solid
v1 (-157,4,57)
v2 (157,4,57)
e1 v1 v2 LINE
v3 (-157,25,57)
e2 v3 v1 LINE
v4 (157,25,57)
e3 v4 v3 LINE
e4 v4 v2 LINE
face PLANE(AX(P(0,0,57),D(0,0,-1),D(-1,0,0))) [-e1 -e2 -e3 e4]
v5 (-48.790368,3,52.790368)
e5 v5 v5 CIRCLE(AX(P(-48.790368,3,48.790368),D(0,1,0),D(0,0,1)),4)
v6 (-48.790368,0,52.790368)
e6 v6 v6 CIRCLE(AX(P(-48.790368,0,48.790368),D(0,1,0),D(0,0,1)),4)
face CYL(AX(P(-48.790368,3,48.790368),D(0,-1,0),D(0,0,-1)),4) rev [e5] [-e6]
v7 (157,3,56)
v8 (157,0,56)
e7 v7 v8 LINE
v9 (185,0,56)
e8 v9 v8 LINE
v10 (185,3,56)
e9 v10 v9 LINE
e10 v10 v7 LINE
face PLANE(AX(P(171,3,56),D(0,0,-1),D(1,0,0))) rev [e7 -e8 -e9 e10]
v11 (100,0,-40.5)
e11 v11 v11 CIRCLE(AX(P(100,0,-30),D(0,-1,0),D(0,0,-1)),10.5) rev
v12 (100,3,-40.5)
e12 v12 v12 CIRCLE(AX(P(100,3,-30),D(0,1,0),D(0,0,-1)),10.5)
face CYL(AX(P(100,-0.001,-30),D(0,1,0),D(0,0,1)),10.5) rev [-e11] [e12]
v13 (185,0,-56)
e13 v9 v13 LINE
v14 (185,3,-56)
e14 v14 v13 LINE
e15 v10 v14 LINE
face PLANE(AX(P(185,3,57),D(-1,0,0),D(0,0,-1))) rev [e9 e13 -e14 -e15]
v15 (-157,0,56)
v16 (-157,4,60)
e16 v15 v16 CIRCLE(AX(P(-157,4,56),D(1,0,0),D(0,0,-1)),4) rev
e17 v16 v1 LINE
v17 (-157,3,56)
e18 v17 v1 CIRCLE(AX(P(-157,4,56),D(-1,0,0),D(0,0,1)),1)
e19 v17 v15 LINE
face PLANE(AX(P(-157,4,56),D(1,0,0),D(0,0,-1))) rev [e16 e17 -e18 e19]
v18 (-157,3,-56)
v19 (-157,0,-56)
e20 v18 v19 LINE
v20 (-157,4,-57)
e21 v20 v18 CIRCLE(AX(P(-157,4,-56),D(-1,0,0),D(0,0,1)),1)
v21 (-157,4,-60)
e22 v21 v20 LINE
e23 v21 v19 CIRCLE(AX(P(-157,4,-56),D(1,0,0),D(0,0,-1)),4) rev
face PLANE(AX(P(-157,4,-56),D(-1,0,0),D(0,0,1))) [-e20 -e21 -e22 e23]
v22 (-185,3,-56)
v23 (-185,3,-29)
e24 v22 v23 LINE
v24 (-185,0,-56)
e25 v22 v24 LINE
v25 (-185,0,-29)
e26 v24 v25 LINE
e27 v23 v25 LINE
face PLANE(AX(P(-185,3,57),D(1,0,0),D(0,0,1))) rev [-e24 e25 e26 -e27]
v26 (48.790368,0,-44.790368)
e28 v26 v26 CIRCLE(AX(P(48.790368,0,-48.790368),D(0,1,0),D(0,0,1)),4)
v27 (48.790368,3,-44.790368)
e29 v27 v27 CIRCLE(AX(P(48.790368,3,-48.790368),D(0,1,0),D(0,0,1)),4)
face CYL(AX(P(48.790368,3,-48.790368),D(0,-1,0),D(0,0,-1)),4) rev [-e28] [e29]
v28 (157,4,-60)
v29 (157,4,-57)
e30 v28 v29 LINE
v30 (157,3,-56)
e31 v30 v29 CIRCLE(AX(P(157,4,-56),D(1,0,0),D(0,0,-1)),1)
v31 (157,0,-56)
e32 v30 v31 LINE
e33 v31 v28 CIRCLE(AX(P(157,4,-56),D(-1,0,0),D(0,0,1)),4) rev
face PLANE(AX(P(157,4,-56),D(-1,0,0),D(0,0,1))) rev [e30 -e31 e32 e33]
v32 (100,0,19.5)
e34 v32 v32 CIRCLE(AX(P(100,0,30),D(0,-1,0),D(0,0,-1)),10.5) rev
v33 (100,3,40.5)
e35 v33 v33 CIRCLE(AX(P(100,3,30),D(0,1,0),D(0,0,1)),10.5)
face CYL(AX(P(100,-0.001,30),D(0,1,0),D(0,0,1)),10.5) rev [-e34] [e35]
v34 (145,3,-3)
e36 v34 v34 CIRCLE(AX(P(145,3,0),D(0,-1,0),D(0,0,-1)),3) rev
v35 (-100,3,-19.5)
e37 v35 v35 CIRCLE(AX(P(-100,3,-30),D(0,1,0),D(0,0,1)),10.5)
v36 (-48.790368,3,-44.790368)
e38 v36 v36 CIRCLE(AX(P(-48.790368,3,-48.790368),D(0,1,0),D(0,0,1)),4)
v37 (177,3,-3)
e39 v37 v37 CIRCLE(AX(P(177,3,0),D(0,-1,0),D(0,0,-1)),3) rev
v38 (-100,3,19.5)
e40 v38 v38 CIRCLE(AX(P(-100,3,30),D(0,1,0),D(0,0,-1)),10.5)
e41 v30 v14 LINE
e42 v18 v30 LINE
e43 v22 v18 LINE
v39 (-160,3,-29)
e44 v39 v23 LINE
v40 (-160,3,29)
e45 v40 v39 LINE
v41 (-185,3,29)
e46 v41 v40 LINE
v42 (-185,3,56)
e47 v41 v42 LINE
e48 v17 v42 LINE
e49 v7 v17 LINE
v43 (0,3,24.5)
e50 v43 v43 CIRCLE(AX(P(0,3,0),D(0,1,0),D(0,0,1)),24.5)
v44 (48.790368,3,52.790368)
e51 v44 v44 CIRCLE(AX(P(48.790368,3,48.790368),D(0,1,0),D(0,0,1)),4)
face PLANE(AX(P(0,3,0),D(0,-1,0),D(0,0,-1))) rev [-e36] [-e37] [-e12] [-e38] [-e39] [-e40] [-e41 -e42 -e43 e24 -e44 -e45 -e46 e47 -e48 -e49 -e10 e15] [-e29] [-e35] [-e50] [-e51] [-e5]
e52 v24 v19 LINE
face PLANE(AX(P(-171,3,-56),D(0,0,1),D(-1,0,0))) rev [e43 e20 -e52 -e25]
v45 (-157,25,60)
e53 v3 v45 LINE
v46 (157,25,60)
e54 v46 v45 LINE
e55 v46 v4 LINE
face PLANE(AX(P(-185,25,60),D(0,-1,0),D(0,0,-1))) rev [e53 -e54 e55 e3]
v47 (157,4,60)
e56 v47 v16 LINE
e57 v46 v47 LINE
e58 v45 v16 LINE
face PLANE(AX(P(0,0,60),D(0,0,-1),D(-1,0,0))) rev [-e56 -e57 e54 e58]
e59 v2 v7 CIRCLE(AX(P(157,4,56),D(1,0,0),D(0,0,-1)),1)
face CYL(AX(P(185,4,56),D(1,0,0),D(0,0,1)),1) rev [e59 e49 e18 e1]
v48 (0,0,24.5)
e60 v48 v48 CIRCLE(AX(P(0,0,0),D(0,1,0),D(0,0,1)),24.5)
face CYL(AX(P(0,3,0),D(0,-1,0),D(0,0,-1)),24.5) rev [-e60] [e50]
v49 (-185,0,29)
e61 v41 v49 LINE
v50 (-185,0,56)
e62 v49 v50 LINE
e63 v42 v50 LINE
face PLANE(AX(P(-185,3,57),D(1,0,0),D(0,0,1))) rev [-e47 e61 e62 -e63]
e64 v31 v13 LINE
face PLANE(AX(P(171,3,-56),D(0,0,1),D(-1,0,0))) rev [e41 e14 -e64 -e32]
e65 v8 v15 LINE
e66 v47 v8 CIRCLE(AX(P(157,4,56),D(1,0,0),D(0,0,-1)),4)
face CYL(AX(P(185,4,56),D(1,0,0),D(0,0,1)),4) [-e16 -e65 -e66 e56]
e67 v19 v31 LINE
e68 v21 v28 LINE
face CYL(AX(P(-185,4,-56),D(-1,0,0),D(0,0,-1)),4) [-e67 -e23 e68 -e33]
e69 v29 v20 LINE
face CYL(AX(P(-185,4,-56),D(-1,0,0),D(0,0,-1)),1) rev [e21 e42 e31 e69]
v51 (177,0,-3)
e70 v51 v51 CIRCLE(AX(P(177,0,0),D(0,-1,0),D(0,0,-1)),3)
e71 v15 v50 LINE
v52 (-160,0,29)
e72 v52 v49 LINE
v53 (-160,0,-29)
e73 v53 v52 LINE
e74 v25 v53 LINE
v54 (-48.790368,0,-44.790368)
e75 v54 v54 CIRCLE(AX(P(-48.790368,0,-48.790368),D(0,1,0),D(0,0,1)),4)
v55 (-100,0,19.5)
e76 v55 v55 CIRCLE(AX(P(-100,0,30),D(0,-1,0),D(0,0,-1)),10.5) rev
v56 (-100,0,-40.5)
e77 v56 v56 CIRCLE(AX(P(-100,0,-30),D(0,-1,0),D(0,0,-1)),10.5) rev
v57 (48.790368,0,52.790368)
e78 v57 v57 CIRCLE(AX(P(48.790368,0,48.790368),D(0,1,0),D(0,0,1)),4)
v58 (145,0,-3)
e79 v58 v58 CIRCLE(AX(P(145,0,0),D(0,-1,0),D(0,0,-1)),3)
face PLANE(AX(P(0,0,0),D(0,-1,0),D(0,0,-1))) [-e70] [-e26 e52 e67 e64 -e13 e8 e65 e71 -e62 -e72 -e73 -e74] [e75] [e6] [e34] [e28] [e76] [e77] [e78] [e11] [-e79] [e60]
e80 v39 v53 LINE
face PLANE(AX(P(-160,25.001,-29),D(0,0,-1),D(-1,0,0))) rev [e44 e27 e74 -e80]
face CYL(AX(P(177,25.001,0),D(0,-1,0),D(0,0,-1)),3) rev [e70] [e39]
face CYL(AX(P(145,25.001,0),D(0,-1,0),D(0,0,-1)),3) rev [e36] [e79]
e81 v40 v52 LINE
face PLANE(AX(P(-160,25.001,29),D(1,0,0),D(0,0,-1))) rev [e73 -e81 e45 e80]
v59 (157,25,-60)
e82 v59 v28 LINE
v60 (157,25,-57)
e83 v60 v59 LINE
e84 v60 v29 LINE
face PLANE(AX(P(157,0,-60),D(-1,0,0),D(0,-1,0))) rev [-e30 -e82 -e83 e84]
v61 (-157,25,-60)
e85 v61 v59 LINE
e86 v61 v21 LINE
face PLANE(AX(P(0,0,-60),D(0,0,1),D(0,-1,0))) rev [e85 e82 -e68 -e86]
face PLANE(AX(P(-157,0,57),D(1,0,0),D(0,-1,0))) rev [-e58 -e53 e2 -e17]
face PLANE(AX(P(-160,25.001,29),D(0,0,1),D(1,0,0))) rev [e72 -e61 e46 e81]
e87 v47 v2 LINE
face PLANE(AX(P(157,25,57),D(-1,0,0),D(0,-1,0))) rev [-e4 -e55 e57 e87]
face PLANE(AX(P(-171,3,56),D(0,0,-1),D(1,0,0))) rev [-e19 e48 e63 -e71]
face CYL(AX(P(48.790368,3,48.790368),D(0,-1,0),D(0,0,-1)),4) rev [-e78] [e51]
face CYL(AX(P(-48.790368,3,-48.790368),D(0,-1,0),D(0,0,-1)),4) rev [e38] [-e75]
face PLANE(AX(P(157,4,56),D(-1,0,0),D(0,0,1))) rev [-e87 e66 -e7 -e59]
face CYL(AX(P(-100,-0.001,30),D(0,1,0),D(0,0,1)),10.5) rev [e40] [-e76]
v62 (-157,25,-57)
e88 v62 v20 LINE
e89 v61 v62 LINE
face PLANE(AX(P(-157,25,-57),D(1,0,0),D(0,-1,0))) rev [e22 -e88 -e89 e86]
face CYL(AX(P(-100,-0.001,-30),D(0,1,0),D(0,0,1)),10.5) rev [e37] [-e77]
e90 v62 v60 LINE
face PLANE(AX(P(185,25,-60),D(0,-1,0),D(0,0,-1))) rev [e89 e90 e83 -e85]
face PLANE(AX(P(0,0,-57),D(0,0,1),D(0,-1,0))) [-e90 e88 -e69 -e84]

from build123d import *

# Parameters (mm, degrees)
SKETCH1_W                      = 370
SKETCH1_H                      = 114
SKETCH1_R                      = 4
SKETCH1_R_2                    = 24.5
BOSS_EXTRUDE1_DEPTH            = 3
EDGE_FLANGE1_STRIP_W           = 14
EDGE_FLANGE1_STRIP_H           = 3
EDGE_FLANGE1_STRIP_CUT_DEPTH   = 370
EDGE_FLANGE1_STRIP_2_W         = 14
EDGE_FLANGE1_STRIP_2_H         = 3
EDGE_FLANGE1_STRIP_CUT_2_DEPTH = 370
EDGE_FLANGE1_DEPTH             = 370
EDGE_FLANGE1_BEND_DEPTH        = 370
CUT_EXTRUDE1_REACH             = 198.087
SKETCH16_R                     = 3
SKETCH16_W                     = 25
SKETCH16_H                     = 58
CUT_EXTRUDE2_REACH             = 197.727
SKETCH17_R                     = 10.5
CUT_EXTRUDE3_START             = -185
CUT_EXTRUDE3_DEPTH             = 28
CUT_EXTRUDE3_START_2           = 157
CUT_EXTRUDE3_2_DEPTH           = 28


# Read off the part's stored shape, not the designer's step: Cut-Extrude3
# Sheet-metal steps are written as plain solids
with BuildPart() as part:
    # Sketch1 → Boss-Extrude1 (new body)
    with BuildSketch(Plane(origin=(0, 0, 0), x_dir=(1, 0, 0), z_dir=(0, 1, 0))):
        Rectangle(SKETCH1_W, SKETCH1_H)
        with Locations(Location((-48.790367902, 48.790367902, 0), (0, 0, 270))):
            Circle(SKETCH1_R, mode=Mode.SUBTRACT)
        with Locations(Location((48.790367902, 48.790367902, 0), (0, 0, 270))):
            Circle(SKETCH1_R, mode=Mode.SUBTRACT)
        with Locations(Location((48.790367902, -48.790367902, 0), (0, 0, 270))):
            Circle(SKETCH1_R, mode=Mode.SUBTRACT)
        with Locations(Location((-48.790367902, -48.790367902, 0), (0, 0, 270))):
            Circle(SKETCH1_R, mode=Mode.SUBTRACT)
        with Locations(Location((0, 0, 0), (0, 0, 270))):
            Circle(SKETCH1_R_2, mode=Mode.SUBTRACT)
    extrude(amount=BOSS_EXTRUDE1_DEPTH)

    # Edge-Flange1 strip (across the edge) → Edge-Flange1 strip cut (cut)
    with BuildSketch(Plane(origin=(-185, 3, 57), x_dir=(0, 0, -1), z_dir=(1, 0, 0))):
        with Locations((-6, -1.5)):
            Rectangle(EDGE_FLANGE1_STRIP_W, EDGE_FLANGE1_STRIP_H)
    extrude(amount=EDGE_FLANGE1_STRIP_CUT_DEPTH, mode=Mode.SUBTRACT)

    # Edge-Flange1 strip 2 (across the edge) → Edge-Flange1 strip cut 2 (cut)
    with BuildSketch(Plane(origin=(185, 3, -57), x_dir=(0, 0, 1), z_dir=(-1, 0, 0))):
        with Locations((-6, -1.5)):
            Rectangle(EDGE_FLANGE1_STRIP_2_W, EDGE_FLANGE1_STRIP_2_H)
    extrude(amount=EDGE_FLANGE1_STRIP_CUT_2_DEPTH, mode=Mode.SUBTRACT)

    # Edge-Flange1 section (across the edge) → Edge-Flange1 (add)
    with BuildSketch(Plane(origin=(-185, 3, 57), x_dir=(0, 0, -1), z_dir=(1, 0, 0))):
        with BuildLine():
            Line((-3, 1), (-3, 22))
            Line((-3, 22), (0, 22))
            Line((0, 22), (0, 1))
            ThreePointArc((0, 1), (0.292893219, 0.292893219), (1, 0))
            Line((1, 0), (1, -3))
            ThreePointArc((1, -3), (-1.828427125, -1.828427125), (-3, 1))
        make_face()
    extrude(amount=EDGE_FLANGE1_DEPTH)

    # Edge-Flange1 section 2 (across the edge) → Edge-Flange1 bend (add)
    with BuildSketch(Plane(origin=(185, 3, -57), x_dir=(0, 0, 1), z_dir=(-1, 0, 0))):
        with BuildLine():
            Line((-3, 1), (-3, 22))
            Line((-3, 22), (0, 22))
            Line((0, 22), (0, 1))
            ThreePointArc((0, 1), (0.292893219, 0.292893219), (1, 0))
            Line((1, 0), (1, -3))
            ThreePointArc((1, -3), (-1.828427125, -1.828427125), (-3, 1))
        make_face()
    extrude(amount=EDGE_FLANGE1_BEND_DEPTH)

    # Sketch16 → Cut-Extrude1 (cut, up to next)
    with BuildSketch(Plane.XZ, mode=Mode.PRIVATE) as cut_extrude1_sk1:
        with Locations(Location((177, 0, 0), (0, 0, 270))):
            Circle(SKETCH16_R)
    cut_extrude1_tool1 = extrude(cut_extrude1_sk1.sketch, amount=-CUT_EXTRUDE1_REACH, mode=Mode.PRIVATE) & part.part
    # Sketch16 → Cut-Extrude1 (cut, up to next)
    with BuildSketch(Plane.XZ, mode=Mode.PRIVATE) as cut_extrude1_sk2:
        with Locations(Location((145, 0, 0), (0, 0, 270))):
            Circle(SKETCH16_R)
    cut_extrude1_tool2 = extrude(cut_extrude1_sk2.sketch, amount=-CUT_EXTRUDE1_REACH, mode=Mode.PRIVATE) & part.part
    # Sketch16 → Cut-Extrude1 (cut, up to next)
    with BuildSketch(Plane.XZ, mode=Mode.PRIVATE) as cut_extrude1_sk3:
        with Locations((-172.5, 0)):
            Rectangle(SKETCH16_W, SKETCH16_H)
    cut_extrude1_tool3 = extrude(cut_extrude1_sk3.sketch, amount=-CUT_EXTRUDE1_REACH, mode=Mode.PRIVATE) & part.part
    add(cut_extrude1_tool1.solids().sort_by_distance((177, 0, 0))[0], mode=Mode.SUBTRACT)
    add(cut_extrude1_tool2.solids().sort_by_distance((145, 0, 0))[0], mode=Mode.SUBTRACT)
    add(cut_extrude1_tool3.solids().sort_by_distance((-172.5, 0, 0))[0], mode=Mode.SUBTRACT)

    # Sketch17 → Cut-Extrude2 (cut, up to next)
    with BuildSketch(Plane(origin=(0, 3, 0), x_dir=(1, 0, 0), z_dir=(0, 1, 0)), mode=Mode.PRIVATE) as cut_extrude2_sk1:
        with Locations(Location((-100, 30, 0), (0, 0, 270))):
            Circle(SKETCH17_R)
    cut_extrude2_tool1 = extrude(cut_extrude2_sk1.sketch, amount=-CUT_EXTRUDE2_REACH, mode=Mode.PRIVATE) & part.part
    # Sketch17 → Cut-Extrude2 (cut, up to next)
    with BuildSketch(Plane(origin=(0, 3, 0), x_dir=(1, 0, 0), z_dir=(0, 1, 0)), mode=Mode.PRIVATE) as cut_extrude2_sk2:
        with Locations(Location((100, 30, 0), (0, 0, 90))):
            Circle(SKETCH17_R)
    cut_extrude2_tool2 = extrude(cut_extrude2_sk2.sketch, amount=-CUT_EXTRUDE2_REACH, mode=Mode.PRIVATE) & part.part
    # Sketch17 → Cut-Extrude2 (cut, up to next)
    with BuildSketch(Plane(origin=(0, 3, 0), x_dir=(1, 0, 0), z_dir=(0, 1, 0)), mode=Mode.PRIVATE) as cut_extrude2_sk3:
        with Locations(Location((100, -30, 0), (0, 0, 270))):
            Circle(SKETCH17_R)
    cut_extrude2_tool3 = extrude(cut_extrude2_sk3.sketch, amount=-CUT_EXTRUDE2_REACH, mode=Mode.PRIVATE) & part.part
    # Sketch17 → Cut-Extrude2 (cut, up to next)
    with BuildSketch(Plane(origin=(0, 3, 0), x_dir=(1, 0, 0), z_dir=(0, 1, 0)), mode=Mode.PRIVATE) as cut_extrude2_sk4:
        with Locations(Location((-100, -30, 0), (0, 0, 90))):
            Circle(SKETCH17_R)
    cut_extrude2_tool4 = extrude(cut_extrude2_sk4.sketch, amount=-CUT_EXTRUDE2_REACH, mode=Mode.PRIVATE) & part.part
    add(cut_extrude2_tool1.solids().sort_by_distance((-100, 3, -30))[0], mode=Mode.SUBTRACT)
    add(cut_extrude2_tool2.solids().sort_by_distance((100, 3, -30))[0], mode=Mode.SUBTRACT)
    add(cut_extrude2_tool3.solids().sort_by_distance((100, 3, 30))[0], mode=Mode.SUBTRACT)
    add(cut_extrude2_tool4.solids().sort_by_distance((-100, 3, 30))[0], mode=Mode.SUBTRACT)

    # Cut-Extrude3 outline → Cut-Extrude3 (cut)
    with BuildSketch(Plane.YZ.offset(CUT_EXTRUDE3_START)):
        with BuildLine():
            ThreePointArc((4, -57), (3.292893219, -56.707106781), (3, -56))
            Line((3, -56), (0, -56))
            ThreePointArc((0, -56), (1.171572875, -58.828427125), (4, -60))
            Line((4, -60), (25, -60))
            Line((25, -60), (25, -57))
            Line((25, -57), (4, -57))
        make_face()
        with BuildLine():
            ThreePointArc((4, 60), (1.171572875, 58.828427125), (0, 56))
            Line((0, 56), (3, 56))
            ThreePointArc((3, 56), (3.292893219, 56.707106781), (4, 57))
            Line((4, 57), (25, 57))
            Line((25, 57), (25, 60))
            Line((25, 60), (4, 60))
        make_face()
    extrude(amount=CUT_EXTRUDE3_DEPTH, mode=Mode.SUBTRACT)

    # Cut-Extrude3 2 outline → Cut-Extrude3 2 (cut)
    with BuildSketch(Plane.YZ.offset(CUT_EXTRUDE3_START_2)):
        with BuildLine():
            ThreePointArc((4, -57), (3.292893219, -56.707106781), (3, -56))
            Line((3, -56), (0, -56))
            ThreePointArc((0, -56), (1.171572875, -58.828427125), (4, -60))
            Line((4, -60), (25, -60))
            Line((25, -60), (25, -57))
            Line((25, -57), (4, -57))
        make_face()
        with BuildLine():
            ThreePointArc((4, 60), (1.171572875, 58.828427125), (0, 56))
            Line((0, 56), (3, 56))
            ThreePointArc((3, 56), (3.292893219, 56.707106781), (4, 57))
            Line((4, 57), (25, 57))
            Line((25, 57), (25, 60))
            Line((25, 60), (4, 60))
        make_face()
    extrude(amount=CUT_EXTRUDE3_2_DEPTH, mode=Mode.SUBTRACT)


solid = part.part
